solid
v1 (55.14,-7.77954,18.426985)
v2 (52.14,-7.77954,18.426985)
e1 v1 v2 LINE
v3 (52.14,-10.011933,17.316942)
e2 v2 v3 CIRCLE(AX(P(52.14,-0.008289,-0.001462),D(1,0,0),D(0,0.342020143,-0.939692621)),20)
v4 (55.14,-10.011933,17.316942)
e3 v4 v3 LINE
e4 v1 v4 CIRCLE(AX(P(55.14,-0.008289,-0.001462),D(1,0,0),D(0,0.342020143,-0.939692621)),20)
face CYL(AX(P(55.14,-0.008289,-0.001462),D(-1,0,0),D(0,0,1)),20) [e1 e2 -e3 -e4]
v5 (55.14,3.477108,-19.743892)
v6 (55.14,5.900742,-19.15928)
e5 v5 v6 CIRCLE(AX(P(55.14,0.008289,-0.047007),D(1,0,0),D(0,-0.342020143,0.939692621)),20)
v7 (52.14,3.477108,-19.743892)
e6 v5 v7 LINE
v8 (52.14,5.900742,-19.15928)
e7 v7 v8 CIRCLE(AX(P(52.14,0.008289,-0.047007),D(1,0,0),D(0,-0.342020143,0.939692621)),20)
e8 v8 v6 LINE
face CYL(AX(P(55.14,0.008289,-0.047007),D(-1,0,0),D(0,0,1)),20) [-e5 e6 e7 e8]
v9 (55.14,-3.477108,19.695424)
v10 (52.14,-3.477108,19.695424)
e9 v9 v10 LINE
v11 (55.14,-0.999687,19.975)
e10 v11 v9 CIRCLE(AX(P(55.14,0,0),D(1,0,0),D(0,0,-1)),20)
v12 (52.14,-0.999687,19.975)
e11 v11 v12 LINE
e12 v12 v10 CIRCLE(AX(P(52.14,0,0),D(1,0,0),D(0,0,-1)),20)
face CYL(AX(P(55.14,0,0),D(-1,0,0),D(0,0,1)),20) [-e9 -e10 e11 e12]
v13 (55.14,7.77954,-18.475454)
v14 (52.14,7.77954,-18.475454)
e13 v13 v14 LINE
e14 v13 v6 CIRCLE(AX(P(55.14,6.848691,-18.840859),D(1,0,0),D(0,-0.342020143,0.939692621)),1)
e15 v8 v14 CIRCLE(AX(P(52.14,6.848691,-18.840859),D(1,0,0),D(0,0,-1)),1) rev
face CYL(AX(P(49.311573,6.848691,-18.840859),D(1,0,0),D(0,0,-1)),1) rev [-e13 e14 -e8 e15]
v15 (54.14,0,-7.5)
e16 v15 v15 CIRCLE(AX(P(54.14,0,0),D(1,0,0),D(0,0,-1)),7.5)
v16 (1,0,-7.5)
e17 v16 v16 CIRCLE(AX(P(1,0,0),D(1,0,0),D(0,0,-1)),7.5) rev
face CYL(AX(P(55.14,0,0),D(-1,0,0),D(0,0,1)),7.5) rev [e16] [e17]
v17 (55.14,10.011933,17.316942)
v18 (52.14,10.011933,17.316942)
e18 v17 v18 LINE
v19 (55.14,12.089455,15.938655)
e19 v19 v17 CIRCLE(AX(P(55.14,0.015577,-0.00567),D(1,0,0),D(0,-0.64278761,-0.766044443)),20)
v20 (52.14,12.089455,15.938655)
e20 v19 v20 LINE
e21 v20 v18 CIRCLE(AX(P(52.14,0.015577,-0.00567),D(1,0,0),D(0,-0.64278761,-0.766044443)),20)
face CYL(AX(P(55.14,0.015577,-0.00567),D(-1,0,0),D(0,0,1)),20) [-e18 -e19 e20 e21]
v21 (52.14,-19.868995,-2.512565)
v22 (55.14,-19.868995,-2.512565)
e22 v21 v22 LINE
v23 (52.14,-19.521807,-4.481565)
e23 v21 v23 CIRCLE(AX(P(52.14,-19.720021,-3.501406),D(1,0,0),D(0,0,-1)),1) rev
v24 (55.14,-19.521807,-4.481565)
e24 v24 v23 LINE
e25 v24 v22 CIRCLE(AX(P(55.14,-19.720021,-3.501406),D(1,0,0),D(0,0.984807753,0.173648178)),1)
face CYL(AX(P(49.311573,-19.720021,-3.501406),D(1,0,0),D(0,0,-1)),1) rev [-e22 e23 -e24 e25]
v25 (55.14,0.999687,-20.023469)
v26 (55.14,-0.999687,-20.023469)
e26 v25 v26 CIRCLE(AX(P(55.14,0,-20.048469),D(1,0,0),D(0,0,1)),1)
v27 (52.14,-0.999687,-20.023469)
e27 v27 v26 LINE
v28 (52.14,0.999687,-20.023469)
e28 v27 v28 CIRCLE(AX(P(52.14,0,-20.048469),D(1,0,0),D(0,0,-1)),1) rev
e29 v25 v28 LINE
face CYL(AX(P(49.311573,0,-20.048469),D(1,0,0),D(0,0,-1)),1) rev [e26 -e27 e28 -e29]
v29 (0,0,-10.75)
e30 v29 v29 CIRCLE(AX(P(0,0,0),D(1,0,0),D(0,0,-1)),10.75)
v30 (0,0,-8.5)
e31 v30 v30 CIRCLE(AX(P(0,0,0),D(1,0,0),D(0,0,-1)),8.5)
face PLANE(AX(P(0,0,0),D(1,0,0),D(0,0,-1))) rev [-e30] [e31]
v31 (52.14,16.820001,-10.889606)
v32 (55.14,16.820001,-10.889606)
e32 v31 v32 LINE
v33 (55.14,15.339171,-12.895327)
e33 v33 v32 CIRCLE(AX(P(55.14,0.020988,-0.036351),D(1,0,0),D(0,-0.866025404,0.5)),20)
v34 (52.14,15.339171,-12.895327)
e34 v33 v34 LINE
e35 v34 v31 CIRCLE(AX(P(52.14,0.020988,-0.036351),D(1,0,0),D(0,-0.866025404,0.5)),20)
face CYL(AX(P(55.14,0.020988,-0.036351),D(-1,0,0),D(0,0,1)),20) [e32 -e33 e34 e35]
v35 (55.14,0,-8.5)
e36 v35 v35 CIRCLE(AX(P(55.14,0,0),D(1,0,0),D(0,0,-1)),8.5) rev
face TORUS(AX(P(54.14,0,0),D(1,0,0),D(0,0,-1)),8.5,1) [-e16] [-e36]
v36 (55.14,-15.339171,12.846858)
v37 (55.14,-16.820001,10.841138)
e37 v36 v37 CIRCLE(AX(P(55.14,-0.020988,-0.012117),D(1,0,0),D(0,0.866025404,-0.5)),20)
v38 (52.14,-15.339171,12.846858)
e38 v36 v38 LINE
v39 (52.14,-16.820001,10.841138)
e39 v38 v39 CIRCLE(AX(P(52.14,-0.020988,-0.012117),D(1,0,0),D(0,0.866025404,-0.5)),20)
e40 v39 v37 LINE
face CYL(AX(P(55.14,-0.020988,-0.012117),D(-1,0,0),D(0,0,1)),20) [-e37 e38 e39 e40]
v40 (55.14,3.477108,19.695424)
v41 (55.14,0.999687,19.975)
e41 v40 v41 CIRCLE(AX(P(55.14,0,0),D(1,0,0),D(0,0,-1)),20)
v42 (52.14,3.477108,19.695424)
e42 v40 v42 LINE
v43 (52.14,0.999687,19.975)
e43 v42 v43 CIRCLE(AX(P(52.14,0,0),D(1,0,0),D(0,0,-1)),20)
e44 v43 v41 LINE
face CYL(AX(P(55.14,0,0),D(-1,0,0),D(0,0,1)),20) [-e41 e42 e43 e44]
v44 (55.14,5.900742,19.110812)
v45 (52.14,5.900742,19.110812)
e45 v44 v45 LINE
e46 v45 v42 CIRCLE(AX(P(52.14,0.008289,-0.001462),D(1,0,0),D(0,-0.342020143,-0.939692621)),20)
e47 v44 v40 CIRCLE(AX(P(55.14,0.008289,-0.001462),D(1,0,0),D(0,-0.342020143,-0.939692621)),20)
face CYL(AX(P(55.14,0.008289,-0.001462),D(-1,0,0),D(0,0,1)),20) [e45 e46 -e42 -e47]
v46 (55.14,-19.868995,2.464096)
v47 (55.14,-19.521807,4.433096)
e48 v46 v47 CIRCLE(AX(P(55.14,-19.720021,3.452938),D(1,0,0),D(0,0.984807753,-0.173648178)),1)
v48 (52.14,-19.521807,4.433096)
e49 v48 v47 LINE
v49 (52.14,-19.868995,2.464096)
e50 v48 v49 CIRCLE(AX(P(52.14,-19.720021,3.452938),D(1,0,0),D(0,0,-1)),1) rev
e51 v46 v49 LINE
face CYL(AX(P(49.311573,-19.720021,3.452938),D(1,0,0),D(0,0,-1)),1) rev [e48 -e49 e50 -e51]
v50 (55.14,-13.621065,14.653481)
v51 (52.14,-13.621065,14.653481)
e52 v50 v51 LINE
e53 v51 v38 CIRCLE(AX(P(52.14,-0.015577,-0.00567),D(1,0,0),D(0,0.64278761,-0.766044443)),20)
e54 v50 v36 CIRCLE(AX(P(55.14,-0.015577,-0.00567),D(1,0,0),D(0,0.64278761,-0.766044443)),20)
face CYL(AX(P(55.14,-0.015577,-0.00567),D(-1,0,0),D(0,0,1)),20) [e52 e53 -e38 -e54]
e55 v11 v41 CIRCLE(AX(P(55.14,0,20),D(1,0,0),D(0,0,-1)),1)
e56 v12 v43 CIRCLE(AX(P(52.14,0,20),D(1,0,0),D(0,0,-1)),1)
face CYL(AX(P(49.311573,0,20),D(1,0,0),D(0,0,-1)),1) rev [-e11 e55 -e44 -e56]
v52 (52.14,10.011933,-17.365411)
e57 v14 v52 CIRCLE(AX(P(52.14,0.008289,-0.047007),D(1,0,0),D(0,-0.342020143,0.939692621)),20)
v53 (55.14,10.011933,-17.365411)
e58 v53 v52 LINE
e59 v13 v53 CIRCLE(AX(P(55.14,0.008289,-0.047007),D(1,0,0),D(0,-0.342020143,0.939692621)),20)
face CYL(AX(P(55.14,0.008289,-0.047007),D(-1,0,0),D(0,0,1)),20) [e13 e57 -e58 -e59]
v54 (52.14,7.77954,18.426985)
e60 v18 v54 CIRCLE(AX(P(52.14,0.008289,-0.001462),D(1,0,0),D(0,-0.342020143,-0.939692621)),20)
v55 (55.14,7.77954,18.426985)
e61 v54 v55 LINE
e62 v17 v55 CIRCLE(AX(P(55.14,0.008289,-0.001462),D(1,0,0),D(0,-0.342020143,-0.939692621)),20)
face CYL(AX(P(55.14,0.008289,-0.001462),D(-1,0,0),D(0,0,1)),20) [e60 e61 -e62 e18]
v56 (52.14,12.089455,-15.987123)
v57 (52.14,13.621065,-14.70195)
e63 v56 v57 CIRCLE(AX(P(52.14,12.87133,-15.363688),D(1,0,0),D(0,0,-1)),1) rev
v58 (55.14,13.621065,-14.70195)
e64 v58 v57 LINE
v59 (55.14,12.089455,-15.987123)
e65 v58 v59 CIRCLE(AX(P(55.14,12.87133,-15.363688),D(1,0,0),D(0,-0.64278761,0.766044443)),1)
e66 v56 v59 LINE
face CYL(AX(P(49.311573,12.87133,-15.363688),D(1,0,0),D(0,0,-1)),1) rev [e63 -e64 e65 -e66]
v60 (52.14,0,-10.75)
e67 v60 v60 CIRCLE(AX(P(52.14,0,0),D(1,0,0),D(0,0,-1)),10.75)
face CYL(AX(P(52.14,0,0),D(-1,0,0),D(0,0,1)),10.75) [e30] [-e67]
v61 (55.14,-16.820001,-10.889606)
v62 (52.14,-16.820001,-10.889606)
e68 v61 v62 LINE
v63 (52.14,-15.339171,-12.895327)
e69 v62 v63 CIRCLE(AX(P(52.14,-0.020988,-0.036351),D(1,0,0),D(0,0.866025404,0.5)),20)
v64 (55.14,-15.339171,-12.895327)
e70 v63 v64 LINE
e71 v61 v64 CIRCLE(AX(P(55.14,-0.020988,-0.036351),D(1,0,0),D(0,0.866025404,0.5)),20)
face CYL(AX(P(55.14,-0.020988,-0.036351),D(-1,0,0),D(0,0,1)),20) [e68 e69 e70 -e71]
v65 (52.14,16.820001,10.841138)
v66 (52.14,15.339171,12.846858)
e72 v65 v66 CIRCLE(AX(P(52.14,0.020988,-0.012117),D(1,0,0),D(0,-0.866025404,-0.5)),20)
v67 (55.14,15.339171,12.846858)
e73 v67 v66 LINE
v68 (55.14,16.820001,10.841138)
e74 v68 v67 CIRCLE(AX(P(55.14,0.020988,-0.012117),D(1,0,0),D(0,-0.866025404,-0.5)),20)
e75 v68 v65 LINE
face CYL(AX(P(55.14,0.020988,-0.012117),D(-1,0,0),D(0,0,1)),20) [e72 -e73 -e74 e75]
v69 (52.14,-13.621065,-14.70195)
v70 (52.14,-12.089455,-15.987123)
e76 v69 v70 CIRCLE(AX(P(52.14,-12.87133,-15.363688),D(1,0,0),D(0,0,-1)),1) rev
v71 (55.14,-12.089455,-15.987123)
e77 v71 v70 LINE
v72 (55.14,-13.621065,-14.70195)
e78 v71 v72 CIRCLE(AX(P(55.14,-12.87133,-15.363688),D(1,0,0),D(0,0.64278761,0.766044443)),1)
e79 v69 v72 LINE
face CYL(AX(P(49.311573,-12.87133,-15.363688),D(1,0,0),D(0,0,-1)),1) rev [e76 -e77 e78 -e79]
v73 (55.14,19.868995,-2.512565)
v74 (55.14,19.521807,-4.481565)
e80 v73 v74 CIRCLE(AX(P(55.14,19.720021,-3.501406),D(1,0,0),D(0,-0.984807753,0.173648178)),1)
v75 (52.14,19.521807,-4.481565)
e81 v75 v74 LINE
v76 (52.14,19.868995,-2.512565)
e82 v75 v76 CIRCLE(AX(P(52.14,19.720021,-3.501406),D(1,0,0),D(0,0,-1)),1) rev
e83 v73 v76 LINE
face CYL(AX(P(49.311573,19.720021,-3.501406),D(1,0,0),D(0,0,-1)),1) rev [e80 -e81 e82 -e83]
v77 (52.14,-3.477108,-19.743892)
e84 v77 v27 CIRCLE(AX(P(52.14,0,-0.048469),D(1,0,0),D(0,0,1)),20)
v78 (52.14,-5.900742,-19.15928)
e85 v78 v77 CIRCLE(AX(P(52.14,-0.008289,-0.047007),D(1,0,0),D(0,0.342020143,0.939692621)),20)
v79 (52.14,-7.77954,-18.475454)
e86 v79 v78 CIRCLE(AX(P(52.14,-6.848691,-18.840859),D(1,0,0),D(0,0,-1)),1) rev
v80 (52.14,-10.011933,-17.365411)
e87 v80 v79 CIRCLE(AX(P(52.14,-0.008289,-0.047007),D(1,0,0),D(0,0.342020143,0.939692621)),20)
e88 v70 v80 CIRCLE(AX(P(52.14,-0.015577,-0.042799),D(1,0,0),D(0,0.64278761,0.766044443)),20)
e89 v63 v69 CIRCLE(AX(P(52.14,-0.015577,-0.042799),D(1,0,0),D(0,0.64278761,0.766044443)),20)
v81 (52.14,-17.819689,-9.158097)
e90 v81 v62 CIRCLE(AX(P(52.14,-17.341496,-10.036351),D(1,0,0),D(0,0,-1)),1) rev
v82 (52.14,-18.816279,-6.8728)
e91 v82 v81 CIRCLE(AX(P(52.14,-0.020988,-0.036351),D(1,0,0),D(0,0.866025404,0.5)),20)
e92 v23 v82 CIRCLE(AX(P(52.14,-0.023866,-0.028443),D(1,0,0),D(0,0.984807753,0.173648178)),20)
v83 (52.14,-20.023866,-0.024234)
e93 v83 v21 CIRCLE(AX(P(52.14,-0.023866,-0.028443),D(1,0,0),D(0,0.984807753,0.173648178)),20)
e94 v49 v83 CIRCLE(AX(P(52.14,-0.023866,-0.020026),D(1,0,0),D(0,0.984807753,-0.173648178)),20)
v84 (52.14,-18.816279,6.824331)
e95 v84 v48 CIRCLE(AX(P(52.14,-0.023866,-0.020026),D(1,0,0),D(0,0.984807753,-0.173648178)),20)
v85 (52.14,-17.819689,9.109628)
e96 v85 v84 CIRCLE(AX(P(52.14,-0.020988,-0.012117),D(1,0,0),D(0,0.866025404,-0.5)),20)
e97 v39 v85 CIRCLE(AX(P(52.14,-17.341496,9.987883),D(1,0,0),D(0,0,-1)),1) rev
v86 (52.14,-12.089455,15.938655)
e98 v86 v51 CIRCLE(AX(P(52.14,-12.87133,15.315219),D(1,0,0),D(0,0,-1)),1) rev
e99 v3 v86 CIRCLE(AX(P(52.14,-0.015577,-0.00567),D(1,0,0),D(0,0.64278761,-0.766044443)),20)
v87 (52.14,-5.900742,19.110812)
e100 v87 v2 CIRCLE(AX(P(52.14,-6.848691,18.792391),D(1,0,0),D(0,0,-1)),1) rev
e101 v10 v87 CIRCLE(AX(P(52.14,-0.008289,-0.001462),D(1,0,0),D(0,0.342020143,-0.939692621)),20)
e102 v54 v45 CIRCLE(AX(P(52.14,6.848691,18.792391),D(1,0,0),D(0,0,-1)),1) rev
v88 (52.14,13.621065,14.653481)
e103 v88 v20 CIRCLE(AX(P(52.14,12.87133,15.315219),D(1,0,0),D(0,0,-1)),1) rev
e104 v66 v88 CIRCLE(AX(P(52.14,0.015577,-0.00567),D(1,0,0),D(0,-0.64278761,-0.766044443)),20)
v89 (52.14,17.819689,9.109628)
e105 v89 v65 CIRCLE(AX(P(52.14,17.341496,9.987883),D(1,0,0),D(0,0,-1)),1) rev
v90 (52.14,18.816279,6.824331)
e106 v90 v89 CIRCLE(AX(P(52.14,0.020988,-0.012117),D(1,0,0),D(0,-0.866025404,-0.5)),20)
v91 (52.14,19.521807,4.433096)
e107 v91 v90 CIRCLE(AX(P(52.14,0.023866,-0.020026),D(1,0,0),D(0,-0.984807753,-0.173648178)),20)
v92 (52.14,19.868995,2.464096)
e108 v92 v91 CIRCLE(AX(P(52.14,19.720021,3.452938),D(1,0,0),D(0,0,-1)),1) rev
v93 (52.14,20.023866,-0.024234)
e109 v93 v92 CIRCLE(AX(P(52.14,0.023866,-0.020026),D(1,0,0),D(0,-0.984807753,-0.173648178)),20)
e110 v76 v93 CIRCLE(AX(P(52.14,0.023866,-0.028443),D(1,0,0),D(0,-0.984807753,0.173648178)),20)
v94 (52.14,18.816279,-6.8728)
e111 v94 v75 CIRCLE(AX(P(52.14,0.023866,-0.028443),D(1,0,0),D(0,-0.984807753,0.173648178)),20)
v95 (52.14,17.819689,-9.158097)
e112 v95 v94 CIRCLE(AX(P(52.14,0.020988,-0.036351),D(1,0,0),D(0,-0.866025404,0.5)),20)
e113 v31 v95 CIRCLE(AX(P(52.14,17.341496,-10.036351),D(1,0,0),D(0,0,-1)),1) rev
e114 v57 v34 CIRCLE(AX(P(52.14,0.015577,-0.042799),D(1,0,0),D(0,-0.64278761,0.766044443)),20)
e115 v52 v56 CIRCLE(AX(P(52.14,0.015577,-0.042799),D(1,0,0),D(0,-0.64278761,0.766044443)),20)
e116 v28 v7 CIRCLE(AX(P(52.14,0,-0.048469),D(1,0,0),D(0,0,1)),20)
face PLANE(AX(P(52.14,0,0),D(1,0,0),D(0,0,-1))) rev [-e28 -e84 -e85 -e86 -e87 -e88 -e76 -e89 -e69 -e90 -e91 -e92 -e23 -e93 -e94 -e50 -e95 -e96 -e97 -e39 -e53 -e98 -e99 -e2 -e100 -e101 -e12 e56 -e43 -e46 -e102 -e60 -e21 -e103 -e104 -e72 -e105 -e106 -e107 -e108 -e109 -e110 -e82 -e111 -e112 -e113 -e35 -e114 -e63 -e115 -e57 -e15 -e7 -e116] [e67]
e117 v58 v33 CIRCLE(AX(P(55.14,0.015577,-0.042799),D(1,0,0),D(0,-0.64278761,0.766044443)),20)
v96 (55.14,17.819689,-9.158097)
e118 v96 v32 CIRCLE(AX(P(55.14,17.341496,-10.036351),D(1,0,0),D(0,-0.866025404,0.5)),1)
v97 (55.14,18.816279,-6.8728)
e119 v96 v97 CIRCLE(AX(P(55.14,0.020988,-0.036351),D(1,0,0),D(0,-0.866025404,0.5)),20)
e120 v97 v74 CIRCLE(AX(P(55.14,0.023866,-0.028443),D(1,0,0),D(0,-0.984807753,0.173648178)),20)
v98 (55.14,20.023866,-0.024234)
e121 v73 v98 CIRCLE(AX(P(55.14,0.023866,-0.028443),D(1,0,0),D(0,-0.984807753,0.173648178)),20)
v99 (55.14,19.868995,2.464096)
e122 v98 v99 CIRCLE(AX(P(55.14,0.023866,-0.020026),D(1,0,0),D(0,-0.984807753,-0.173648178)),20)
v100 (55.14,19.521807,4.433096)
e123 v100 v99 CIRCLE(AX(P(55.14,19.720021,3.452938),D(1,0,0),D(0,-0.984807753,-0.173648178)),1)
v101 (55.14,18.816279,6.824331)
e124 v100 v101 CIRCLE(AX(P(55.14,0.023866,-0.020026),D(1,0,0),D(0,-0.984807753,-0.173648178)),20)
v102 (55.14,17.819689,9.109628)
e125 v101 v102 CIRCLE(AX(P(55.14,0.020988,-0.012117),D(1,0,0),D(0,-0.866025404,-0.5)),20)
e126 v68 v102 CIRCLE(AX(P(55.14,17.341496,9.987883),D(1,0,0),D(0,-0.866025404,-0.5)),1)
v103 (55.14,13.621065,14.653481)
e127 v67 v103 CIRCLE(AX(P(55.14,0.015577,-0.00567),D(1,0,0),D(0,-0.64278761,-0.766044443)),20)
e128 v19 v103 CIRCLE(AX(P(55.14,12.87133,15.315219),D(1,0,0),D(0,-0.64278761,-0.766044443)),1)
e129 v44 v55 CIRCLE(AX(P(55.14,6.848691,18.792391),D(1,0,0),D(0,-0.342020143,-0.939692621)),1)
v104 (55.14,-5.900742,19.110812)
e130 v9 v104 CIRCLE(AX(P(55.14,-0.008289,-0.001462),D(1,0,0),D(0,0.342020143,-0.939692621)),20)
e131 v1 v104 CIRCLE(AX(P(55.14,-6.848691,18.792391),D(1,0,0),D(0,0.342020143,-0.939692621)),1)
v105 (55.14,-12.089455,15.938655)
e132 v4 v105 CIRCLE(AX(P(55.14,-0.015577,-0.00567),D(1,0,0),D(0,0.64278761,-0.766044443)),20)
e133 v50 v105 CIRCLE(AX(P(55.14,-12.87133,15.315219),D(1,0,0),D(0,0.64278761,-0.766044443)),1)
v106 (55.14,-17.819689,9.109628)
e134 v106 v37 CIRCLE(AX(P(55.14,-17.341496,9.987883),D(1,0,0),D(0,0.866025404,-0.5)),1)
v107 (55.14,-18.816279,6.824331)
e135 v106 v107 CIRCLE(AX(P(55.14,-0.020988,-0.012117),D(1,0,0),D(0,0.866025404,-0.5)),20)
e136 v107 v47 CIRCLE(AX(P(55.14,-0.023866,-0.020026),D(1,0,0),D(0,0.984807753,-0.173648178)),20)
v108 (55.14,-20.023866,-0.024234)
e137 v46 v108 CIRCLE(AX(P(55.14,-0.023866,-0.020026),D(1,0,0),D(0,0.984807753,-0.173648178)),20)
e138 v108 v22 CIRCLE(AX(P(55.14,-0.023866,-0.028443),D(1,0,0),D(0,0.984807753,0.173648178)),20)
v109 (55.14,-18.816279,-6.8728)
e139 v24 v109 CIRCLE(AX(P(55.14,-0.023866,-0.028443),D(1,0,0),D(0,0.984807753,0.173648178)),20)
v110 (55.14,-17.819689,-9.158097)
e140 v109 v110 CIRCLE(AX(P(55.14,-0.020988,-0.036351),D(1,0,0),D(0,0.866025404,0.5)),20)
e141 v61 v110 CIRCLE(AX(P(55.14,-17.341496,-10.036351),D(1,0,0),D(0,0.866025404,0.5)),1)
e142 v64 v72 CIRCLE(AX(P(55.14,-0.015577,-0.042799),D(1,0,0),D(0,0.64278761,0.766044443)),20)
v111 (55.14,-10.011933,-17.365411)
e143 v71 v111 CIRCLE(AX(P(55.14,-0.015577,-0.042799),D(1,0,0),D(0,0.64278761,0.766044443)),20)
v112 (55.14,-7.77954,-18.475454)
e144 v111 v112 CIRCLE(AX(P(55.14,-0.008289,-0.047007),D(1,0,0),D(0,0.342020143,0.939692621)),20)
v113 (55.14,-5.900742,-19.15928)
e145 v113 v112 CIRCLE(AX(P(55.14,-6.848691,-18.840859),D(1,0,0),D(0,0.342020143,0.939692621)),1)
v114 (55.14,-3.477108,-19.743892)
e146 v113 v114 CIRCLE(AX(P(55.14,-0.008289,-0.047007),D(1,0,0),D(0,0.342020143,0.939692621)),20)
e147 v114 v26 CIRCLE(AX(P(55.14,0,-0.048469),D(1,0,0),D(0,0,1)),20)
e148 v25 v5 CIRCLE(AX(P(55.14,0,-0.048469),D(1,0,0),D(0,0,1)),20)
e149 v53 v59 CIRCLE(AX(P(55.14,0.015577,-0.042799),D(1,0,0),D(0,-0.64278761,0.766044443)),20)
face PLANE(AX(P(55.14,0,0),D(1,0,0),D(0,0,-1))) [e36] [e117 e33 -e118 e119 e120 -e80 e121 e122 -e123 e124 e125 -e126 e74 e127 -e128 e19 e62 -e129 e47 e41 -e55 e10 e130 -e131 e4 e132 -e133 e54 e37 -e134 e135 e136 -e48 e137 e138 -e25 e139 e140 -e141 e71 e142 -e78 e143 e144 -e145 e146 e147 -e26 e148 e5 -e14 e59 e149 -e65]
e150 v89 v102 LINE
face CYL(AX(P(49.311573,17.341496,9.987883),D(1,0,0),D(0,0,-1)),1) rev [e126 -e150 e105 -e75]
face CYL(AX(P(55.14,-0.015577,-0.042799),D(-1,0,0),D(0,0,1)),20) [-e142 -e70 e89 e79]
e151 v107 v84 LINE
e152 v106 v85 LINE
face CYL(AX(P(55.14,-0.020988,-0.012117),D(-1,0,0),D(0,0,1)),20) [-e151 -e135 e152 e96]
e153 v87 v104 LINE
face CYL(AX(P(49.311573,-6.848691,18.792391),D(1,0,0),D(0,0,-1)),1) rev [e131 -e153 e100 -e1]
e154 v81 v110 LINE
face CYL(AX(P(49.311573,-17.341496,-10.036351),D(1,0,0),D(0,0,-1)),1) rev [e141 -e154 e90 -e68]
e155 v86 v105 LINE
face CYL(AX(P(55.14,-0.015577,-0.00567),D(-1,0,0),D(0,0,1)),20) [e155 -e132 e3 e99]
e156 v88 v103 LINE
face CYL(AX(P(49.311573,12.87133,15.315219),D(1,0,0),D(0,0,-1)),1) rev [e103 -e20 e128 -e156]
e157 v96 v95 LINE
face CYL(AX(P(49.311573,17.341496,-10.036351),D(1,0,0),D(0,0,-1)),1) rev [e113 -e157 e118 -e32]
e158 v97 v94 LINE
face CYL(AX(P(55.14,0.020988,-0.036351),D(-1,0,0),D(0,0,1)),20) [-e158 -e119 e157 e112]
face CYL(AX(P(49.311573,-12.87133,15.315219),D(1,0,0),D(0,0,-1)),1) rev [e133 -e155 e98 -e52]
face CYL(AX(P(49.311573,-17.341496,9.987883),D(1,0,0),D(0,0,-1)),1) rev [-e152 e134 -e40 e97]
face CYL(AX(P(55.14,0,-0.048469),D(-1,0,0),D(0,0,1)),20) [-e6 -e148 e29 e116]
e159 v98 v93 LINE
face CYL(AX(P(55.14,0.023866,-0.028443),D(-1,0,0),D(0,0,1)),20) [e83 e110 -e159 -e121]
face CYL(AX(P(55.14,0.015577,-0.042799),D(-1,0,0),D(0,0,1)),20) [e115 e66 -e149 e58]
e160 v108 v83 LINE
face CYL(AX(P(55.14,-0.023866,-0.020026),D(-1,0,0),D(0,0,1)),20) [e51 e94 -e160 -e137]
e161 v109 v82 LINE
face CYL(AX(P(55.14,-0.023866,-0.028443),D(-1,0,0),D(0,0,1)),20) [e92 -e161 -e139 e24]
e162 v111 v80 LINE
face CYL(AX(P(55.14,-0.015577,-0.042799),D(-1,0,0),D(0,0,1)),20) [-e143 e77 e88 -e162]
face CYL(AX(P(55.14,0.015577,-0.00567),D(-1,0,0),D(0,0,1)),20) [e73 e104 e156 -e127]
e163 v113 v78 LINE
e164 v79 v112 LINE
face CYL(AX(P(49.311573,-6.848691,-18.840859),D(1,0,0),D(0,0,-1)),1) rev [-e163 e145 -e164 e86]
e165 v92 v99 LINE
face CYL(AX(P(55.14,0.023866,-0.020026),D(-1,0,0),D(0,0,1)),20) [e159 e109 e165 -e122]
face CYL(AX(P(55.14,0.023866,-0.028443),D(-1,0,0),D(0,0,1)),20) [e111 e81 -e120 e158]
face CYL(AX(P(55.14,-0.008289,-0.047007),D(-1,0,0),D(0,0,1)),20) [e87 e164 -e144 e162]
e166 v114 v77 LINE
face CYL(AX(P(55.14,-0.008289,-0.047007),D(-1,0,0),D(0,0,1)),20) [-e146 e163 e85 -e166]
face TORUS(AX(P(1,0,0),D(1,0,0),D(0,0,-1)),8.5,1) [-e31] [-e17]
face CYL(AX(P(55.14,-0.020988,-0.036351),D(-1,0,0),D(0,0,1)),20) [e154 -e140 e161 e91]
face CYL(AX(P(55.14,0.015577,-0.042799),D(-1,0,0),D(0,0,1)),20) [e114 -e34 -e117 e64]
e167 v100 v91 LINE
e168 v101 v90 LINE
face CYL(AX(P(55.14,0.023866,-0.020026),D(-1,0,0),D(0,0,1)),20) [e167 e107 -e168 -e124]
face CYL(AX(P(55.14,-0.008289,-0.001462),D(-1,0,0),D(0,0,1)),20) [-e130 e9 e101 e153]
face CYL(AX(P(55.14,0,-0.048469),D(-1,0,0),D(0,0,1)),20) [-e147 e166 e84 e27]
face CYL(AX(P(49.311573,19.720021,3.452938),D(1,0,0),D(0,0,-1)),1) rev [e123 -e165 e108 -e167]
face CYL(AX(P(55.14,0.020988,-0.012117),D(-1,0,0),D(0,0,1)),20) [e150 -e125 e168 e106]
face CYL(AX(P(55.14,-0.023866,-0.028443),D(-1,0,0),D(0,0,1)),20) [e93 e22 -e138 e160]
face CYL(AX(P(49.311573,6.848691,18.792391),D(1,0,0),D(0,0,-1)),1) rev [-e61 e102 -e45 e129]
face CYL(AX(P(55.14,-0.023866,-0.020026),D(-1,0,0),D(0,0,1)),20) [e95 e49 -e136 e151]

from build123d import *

# Parameters (mm, degrees)
SKETCH1_R           = 10.75
BOSS_EXTRUDE2_DEPTH = 52.14
SKETCH2_R           = 20
BOSS_EXTRUDE3_DEPTH = 3
SKETCH3_R           = 1
CUT_EXTRUDE1_DEPTH  = 3
CIRPATTERN1_START   = 52.14
CIRPATTERN1_DEPTH   = 3
CIRPATTERN1_2_DEPTH = 3
SKETCH4_R           = 7.5
CUT_EXTRUDE2_DEPTH  = 62.986402598
FILLET2_R           = 1
FILLET4_R           = 1


# Read off the part's stored shape, not the designer's step: CirPattern1
with BuildPart() as part:
    # Sketch1 → Boss-Extrude2 (new body)
    with BuildSketch(Plane(origin=(0, 0, 0), x_dir=(0, 0, -1), z_dir=(1, 0, 0))):
        Circle(SKETCH1_R)
    extrude(amount=BOSS_EXTRUDE2_DEPTH)

    # Sketch2 → Boss-Extrude3 (add)
    with BuildSketch(Plane(origin=(52.14, 0, 0), x_dir=(0, 0, -1), z_dir=(1, 0, 0))):
        Circle(SKETCH2_R)
    extrude(amount=BOSS_EXTRUDE3_DEPTH)

    # Sketch3 → Cut-Extrude1 (cut)
    with BuildSketch(Plane(origin=(55.14, 0, 0), x_dir=(0, 0, -1), z_dir=(1, 0, 0))):
        with Locations((-20, 0)):
            Circle(SKETCH3_R)
    extrude(amount=-CUT_EXTRUDE1_DEPTH, mode=Mode.SUBTRACT)

    # CirPattern1 outline → CirPattern1 (cut)
    with BuildSketch(Plane.YZ.offset(CIRPATTERN1_START)):
        with BuildLine():
            ThreePointArc((5.900409052, 19.109818759), (6.506281956, 17.852840103), (7.778852675, 18.425239512))
            ThreePointArc((7.778852675, 18.425239512), (6.848190457, 18.791016137), (5.900409052, 19.109818759))
        make_face()
        with BuildLine():
            ThreePointArc((12.086414836, 15.934822761), (12.22794579, 14.549675416), (13.61678206, 14.648660223))
            ThreePointArc((13.61678206, 14.648660223), (12.867677964, 15.310874038), (12.086414836, 15.934822761))
        make_face()
        with BuildLine():
            ThreePointArc((16.810590801, 10.835314343), (16.47494628, 9.48879137), (17.808086245, 9.103409487))
            ThreePointArc((17.808086245, 9.103409487), (17.330985942, 9.981829806), (16.810590801, 10.835314343))
        make_face()
        with BuildLine():
            ThreePointArc((19.503391106, 4.429191278), (18.735007106, 3.280463458), (19.847989696, 2.461159283))
            ThreePointArc((19.847989696, 2.461159283), (19.700281222, 3.449481086), (19.503391106, 4.429191278))
        make_face()
        with BuildLine():
            ThreePointArc((19.84201465, -2.50887517), (18.735421034, -3.32658451), (19.492870417, -4.475265679))
            ThreePointArc((19.492870417, -4.475265679), (19.692002659, -3.49643122), (19.84201465, -2.50887517))
        make_face()
        with BuildLine():
            ThreePointArc((17.788419504, -9.141779453), (16.475994384, -9.535444558), (16.788488823, -10.869528189))
            ThreePointArc((16.788488823, -10.869528189), (17.310023867, -10.018137238), (17.788419504, -9.141779453))
        make_face()
        with BuildLine():
            ThreePointArc((13.592634413, -14.671069822), (12.229137651, -14.597143884), (12.063064753, -15.952506661))
            ThreePointArc((12.063064753, -15.952506661), (12.843840743, -15.330875871), (13.592634413, -14.671069822))
        make_face()
        with BuildLine():
            ThreePointArc((7.761531719, -18.432542564), (6.507059889, -17.901025517), (5.886728013, -19.114037598))
            ThreePointArc((5.886728013, -19.114037598), (6.832631799, -18.796679034), (7.761531719, -18.432542564))
        make_face()
        with BuildLine():
            ThreePointArc((0.997306295, -19.975119027), (0, -19.048468559), (-0.997306295, -19.975119027))
            ThreePointArc((-0.997306295, -19.975119027), (0, -20), (0.997306295, -19.975119027))
        make_face()
        with BuildLine():
            ThreePointArc((-5.886728013, -19.114037598), (-6.507059889, -17.901025517), (-7.761531719, -18.432542564))
            ThreePointArc((-7.761531719, -18.432542564), (-6.832631799, -18.796679034), (-5.886728013, -19.114037598))
        make_face()
        with BuildLine():
            ThreePointArc((-12.063064753, -15.952506661), (-12.229137651, -14.597143884), (-13.592634413, -14.671069822))
            ThreePointArc((-13.592634413, -14.671069822), (-12.843840743, -15.330875871), (-12.063064753, -15.952506661))
        make_face()
        with BuildLine():
            ThreePointArc((-16.788488823, -10.869528189), (-16.475994384, -9.535444558), (-17.788419504, -9.141779453))
            ThreePointArc((-17.788419504, -9.141779453), (-17.310023867, -10.018137238), (-16.788488823, -10.869528189))
        make_face()
        with BuildLine():
            ThreePointArc((-19.492870417, -4.475265679), (-18.735421034, -3.32658451), (-19.84201465, -2.50887517))
            ThreePointArc((-19.84201465, -2.50887517), (-19.692002659, -3.49643122), (-19.492870417, -4.475265679))
        make_face()
        with BuildLine():
            ThreePointArc((-19.847989696, 2.461159283), (-18.735007106, 3.280463458), (-19.503391106, 4.429191278))
            ThreePointArc((-19.503391106, 4.429191278), (-19.700281222, 3.449481086), (-19.847989696, 2.461159283))
        make_face()
        with BuildLine():
            ThreePointArc((-17.808086245, 9.103409487), (-16.47494628, 9.48879137), (-16.810590801, 10.835314343))
            ThreePointArc((-16.810590801, 10.835314343), (-17.330985942, 9.981829806), (-17.808086245, 9.103409487))
        make_face()
        with BuildLine():
            ThreePointArc((-13.61678206, 14.648660223), (-12.22794579, 14.549675416), (-12.086414836, 15.934822761))
            ThreePointArc((-12.086414836, 15.934822761), (-12.867677964, 15.310874038), (-13.61678206, 14.648660223))
        make_face()
        with BuildLine():
            ThreePointArc((-7.778852675, 18.425239512), (-6.506281956, 17.852840103), (-5.900409052, 19.109818759))
            ThreePointArc((-5.900409052, 19.109818759), (-6.848190457, 18.791016137), (-7.778852675, 18.425239512))
        make_face()
    extrude(amount=CIRPATTERN1_DEPTH, mode=Mode.SUBTRACT)

    # CirPattern1 2 outline → CirPattern1 2 (add)
    with BuildSketch(Plane.YZ.offset(CIRPATTERN1_START)):
        with BuildLine():
            ThreePointArc((3.477107782, 19.695423871), (4.697891956, 19.440416949), (5.900409052, 19.109818759))
            ThreePointArc((5.900409052, 19.109818759), (5.900575423, 19.110315343), (5.900742054, 19.11081184))
            ThreePointArc((5.900742054, 19.11081184), (4.6980433, 19.44092006), (3.477107782, 19.695423871))
        make_face()
        with BuildLine():
            ThreePointArc((7.778852675, 18.425239512), (10.010382471, 17.314509603), (12.086414836, 15.934822761))
            ThreePointArc((12.086414836, 15.934822761), (12.087932565, 15.936740596), (12.089454981, 15.938654714))
            ThreePointArc((12.089454981, 15.938654714), (11.072191499, 16.660202173), (10.011932832, 17.316942067))
            ThreePointArc((10.011932832, 17.316942067), (8.913050067, 17.90678306), (7.779539896, 18.426985349))
            ThreePointArc((7.779539896, 18.426985349), (7.779196695, 18.426112269), (7.778852675, 18.425239512))
        make_face()
        with BuildLine():
            ThreePointArc((13.61678206, 14.648660223), (15.332698931, 12.841664358), (16.810590801, 10.835314343))
            ThreePointArc((16.810590801, 10.835314343), (16.815287954, 10.838238984), (16.820001217, 10.841137589))
            ThreePointArc((16.820001217, 10.841137589), (16.110869994, 11.867095014), (15.339171021, 12.846858467))
            ThreePointArc((15.339171021, 12.846858467), (14.508296497, 13.776967737), (13.621065015, 14.6534813))
            ThreePointArc((13.621065015, 14.6534813), (13.618927424, 14.651067309), (13.61678206, 14.648660223))
        make_face()
        with BuildLine():
            ThreePointArc((17.808086245, 9.103409487), (18.801560161, 6.819188772), (19.503391106, 4.429191278))
            ThreePointArc((19.503391106, 4.429191278), (19.512589898, 4.431187106), (19.521807069, 4.43309626))
            ThreePointArc((19.521807069, 4.43309626), (19.206339797, 5.639718044), (18.816278804, 6.824331125))
            ThreePointArc((18.816278804, 6.824331125), (18.35362825, 7.982523766), (17.819688668, 9.109628132))
            ThreePointArc((17.819688668, 9.109628132), (17.813897689, 9.106499718), (17.808086245, 9.103409487))
        make_face()
        with BuildLine():
            ThreePointArc((19.847989696, 2.461159283), (19.999985547, -0.024044267), (19.84201465, -2.50887517))
            ThreePointArc((19.84201465, -2.50887517), (19.855517324, -2.510628199), (19.868994877, -2.512564914))
            ThreePointArc((19.868994877, -2.512564914), (19.985241565, -1.270815167), (20.023865664, -0.02423428))
            ThreePointArc((20.023865664, -0.02423428), (19.985241565, 1.222346607), (19.868994877, 2.464096355))
            ThreePointArc((19.868994877, 2.464096355), (19.858500074, 2.462572129), (19.847989696, 2.461159283))
        make_face()
        with BuildLine():
            ThreePointArc((19.492870417, -4.475265679), (18.786104765, -6.86165197), (17.788419504, -9.141779453))
            ThreePointArc((17.788419504, -9.141779453), (17.804126031, -9.149800201), (17.819688668, -9.158096691))
            ThreePointArc((17.819688668, -9.158096691), (18.35362825, -8.030992325), (18.816278804, -6.872799684))
            ThreePointArc((18.816278804, -6.872799684), (19.206339797, -5.688186603), (19.521807069, -4.481564819))
            ThreePointArc((19.521807069, -4.481564819), (19.507315424, -4.478522373), (19.492870417, -4.475265679))
        make_face()
        with BuildLine():
            ThreePointArc((16.788488823, -10.869528189), (15.309019954, -12.869883761), (13.592634413, -14.671069822))
            ThreePointArc((13.592634413, -14.671069822), (13.607011755, -14.686360653), (13.621065015, -14.701949859))
            ThreePointArc((13.621065015, -14.701949859), (14.508296497, -13.825436296), (15.339171021, -12.895327026))
            ThreePointArc((15.339171021, -12.895327026), (16.110869994, -11.915563573), (16.820001217, -10.889606148))
            ThreePointArc((16.820001217, -10.889606148), (16.804151235, -10.879714364), (16.788488823, -10.869528189))
        make_face()
        with BuildLine():
            ThreePointArc((12.063064753, -15.952506661), (9.989559592, -17.326531654), (7.761531719, -18.432542564))
            ThreePointArc((7.761531719, -18.432542564), (7.770785461, -18.453893466), (7.779539896, -18.475453908))
            ThreePointArc((7.779539896, -18.475453908), (8.913050067, -17.955251619), (10.011932832, -17.365410626))
            ThreePointArc((10.011932832, -17.365410626), (11.072191499, -16.708670732), (12.089454981, -15.987123273))
            ThreePointArc((12.089454981, -15.987123273), (12.076071493, -15.969958576), (12.063064753, -15.952506661))
        make_face()
        with BuildLine():
            ThreePointArc((5.886728013, -19.114037598), (3.468839488, -19.696881799), (0.997306295, -19.975119027))
            ThreePointArc((0.997306295, -19.975119027), (0.99878948, -19.999279383), (0.999687451, -20.023468559))
            ThreePointArc((0.999687451, -20.023468559), (2.242758256, -19.922321618), (3.477107782, -19.74389243))
            ThreePointArc((3.477107782, -19.74389243), (4.6980433, -19.489388619), (5.900742054, -19.159280399))
            ThreePointArc((5.900742054, -19.159280399), (5.893467138, -19.13674198), (5.886728013, -19.114037598))
        make_face()
        with BuildLine():
            ThreePointArc((-0.997306295, -19.975119027), (-3.468839488, -19.696881799), (-5.886728013, -19.114037598))
            ThreePointArc((-5.886728013, -19.114037598), (-5.893467138, -19.13674198), (-5.900742054, -19.159280399))
            ThreePointArc((-5.900742054, -19.159280399), (-4.6980433, -19.489388619), (-3.477107782, -19.74389243))
            ThreePointArc((-3.477107782, -19.74389243), (-2.242758256, -19.922321618), (-0.999687451, -20.023468559))
            ThreePointArc((-0.999687451, -20.023468559), (-0.99878948, -19.999279383), (-0.997306295, -19.975119027))
        make_face()
        with BuildLine():
            ThreePointArc((-7.761531719, -18.432542564), (-9.989559592, -17.326531654), (-12.063064753, -15.952506661))
            ThreePointArc((-12.063064753, -15.952506661), (-12.076071493, -15.969958576), (-12.089454981, -15.987123273))
            ThreePointArc((-12.089454981, -15.987123273), (-11.072191499, -16.708670732), (-10.011932832, -17.365410626))
            ThreePointArc((-10.011932832, -17.365410626), (-8.913050067, -17.955251619), (-7.779539896, -18.475453908))
            ThreePointArc((-7.779539896, -18.475453908), (-7.770785461, -18.453893466), (-7.761531719, -18.432542564))
        make_face()
        with BuildLine():
            ThreePointArc((-13.592634413, -14.671069822), (-15.309019954, -12.869883761), (-16.788488823, -10.869528189))
            ThreePointArc((-16.788488823, -10.869528189), (-16.804151235, -10.879714364), (-16.820001217, -10.889606148))
            ThreePointArc((-16.820001217, -10.889606148), (-16.110869994, -11.915563573), (-15.339171021, -12.895327026))
            ThreePointArc((-15.339171021, -12.895327026), (-14.508296497, -13.825436296), (-13.621065015, -14.701949859))
            ThreePointArc((-13.621065015, -14.701949859), (-13.607011755, -14.686360653), (-13.592634413, -14.671069822))
        make_face()
        with BuildLine():
            ThreePointArc((-17.788419504, -9.141779453), (-18.786104765, -6.86165197), (-19.492870417, -4.475265679))
            ThreePointArc((-19.492870417, -4.475265679), (-19.507315424, -4.478522373), (-19.521807069, -4.481564819))
            ThreePointArc((-19.521807069, -4.481564819), (-19.206339797, -5.688186603), (-18.816278804, -6.872799684))
            ThreePointArc((-18.816278804, -6.872799684), (-18.35362825, -8.030992325), (-17.819688668, -9.158096691))
            ThreePointArc((-17.819688668, -9.158096691), (-17.804126031, -9.149800201), (-17.788419504, -9.141779453))
        make_face()
        with BuildLine():
            ThreePointArc((-19.84201465, -2.50887517), (-19.999985547, -0.024044267), (-19.847989696, 2.461159283))
            ThreePointArc((-19.847989696, 2.461159283), (-19.858500074, 2.462572129), (-19.868994877, 2.464096355))
            ThreePointArc((-19.868994877, 2.464096355), (-19.985241565, 1.222346607), (-20.023865664, -0.02423428))
            ThreePointArc((-20.023865664, -0.02423428), (-19.985241565, -1.270815167), (-19.868994877, -2.512564914))
            ThreePointArc((-19.868994877, -2.512564914), (-19.855517324, -2.510628199), (-19.84201465, -2.50887517))
        make_face()
        with BuildLine():
            ThreePointArc((-19.503391106, 4.429191278), (-18.801560161, 6.819188772), (-17.808086245, 9.103409487))
            ThreePointArc((-17.808086245, 9.103409487), (-17.813897689, 9.106499718), (-17.819688668, 9.109628132))
            ThreePointArc((-17.819688668, 9.109628132), (-18.35362825, 7.982523766), (-18.816278804, 6.824331125))
            ThreePointArc((-18.816278804, 6.824331125), (-19.206339797, 5.639718044), (-19.521807069, 4.43309626))
            ThreePointArc((-19.521807069, 4.43309626), (-19.512589898, 4.431187106), (-19.503391106, 4.429191278))
        make_face()
        with BuildLine():
            ThreePointArc((-16.810590801, 10.835314343), (-15.332698931, 12.841664358), (-13.61678206, 14.648660223))
            ThreePointArc((-13.61678206, 14.648660223), (-13.618927424, 14.651067309), (-13.621065015, 14.6534813))
            ThreePointArc((-13.621065015, 14.6534813), (-14.508296497, 13.776967737), (-15.339171021, 12.846858467))
            ThreePointArc((-15.339171021, 12.846858467), (-16.110869994, 11.867095014), (-16.820001217, 10.841137589))
            ThreePointArc((-16.820001217, 10.841137589), (-16.815287954, 10.838238984), (-16.810590801, 10.835314343))
        make_face()
        with BuildLine():
            ThreePointArc((-12.086414836, 15.934822761), (-10.010382471, 17.314509603), (-7.778852675, 18.425239512))
            ThreePointArc((-7.778852675, 18.425239512), (-7.779196695, 18.426112269), (-7.779539896, 18.426985349))
            ThreePointArc((-7.779539896, 18.426985349), (-8.913050067, 17.90678306), (-10.011932832, 17.316942067))
            ThreePointArc((-10.011932832, 17.316942067), (-11.072191499, 16.660202173), (-12.089454981, 15.938654714))
            ThreePointArc((-12.089454981, 15.938654714), (-12.087932565, 15.936740596), (-12.086414836, 15.934822761))
        make_face()
        with BuildLine():
            ThreePointArc((-3.477107782, 19.695423871), (-4.6980433, 19.44092006), (-5.900742054, 19.11081184))
            ThreePointArc((-5.900742054, 19.11081184), (-5.900575423, 19.110315343), (-5.900409052, 19.109818759))
            ThreePointArc((-5.900409052, 19.109818759), (-4.697891956, 19.440416949), (-3.477107782, 19.695423871))
        make_face()
    extrude(amount=CIRPATTERN1_2_DEPTH)

    # Sketch4 → Cut-Extrude2 (cut, through all)
    with BuildSketch(Plane.ZY):
        Circle(SKETCH4_R)
    extrude(amount=-CUT_EXTRUDE2_DEPTH, mode=Mode.SUBTRACT)

    # Fillet2
    fillet2_edges = [part.edges().sort_by_distance(p)[0] for p in [
        (55.14, 0, -7.5),
    ]]
    fillet(fillet2_edges, radius=FILLET2_R)

    # Fillet4
    fillet4_edges = [part.edges().sort_by_distance(p)[0] for p in [
        (0, 0, -7.5),
    ]]
    fillet(fillet4_edges, radius=FILLET4_R)


solid = part.part
